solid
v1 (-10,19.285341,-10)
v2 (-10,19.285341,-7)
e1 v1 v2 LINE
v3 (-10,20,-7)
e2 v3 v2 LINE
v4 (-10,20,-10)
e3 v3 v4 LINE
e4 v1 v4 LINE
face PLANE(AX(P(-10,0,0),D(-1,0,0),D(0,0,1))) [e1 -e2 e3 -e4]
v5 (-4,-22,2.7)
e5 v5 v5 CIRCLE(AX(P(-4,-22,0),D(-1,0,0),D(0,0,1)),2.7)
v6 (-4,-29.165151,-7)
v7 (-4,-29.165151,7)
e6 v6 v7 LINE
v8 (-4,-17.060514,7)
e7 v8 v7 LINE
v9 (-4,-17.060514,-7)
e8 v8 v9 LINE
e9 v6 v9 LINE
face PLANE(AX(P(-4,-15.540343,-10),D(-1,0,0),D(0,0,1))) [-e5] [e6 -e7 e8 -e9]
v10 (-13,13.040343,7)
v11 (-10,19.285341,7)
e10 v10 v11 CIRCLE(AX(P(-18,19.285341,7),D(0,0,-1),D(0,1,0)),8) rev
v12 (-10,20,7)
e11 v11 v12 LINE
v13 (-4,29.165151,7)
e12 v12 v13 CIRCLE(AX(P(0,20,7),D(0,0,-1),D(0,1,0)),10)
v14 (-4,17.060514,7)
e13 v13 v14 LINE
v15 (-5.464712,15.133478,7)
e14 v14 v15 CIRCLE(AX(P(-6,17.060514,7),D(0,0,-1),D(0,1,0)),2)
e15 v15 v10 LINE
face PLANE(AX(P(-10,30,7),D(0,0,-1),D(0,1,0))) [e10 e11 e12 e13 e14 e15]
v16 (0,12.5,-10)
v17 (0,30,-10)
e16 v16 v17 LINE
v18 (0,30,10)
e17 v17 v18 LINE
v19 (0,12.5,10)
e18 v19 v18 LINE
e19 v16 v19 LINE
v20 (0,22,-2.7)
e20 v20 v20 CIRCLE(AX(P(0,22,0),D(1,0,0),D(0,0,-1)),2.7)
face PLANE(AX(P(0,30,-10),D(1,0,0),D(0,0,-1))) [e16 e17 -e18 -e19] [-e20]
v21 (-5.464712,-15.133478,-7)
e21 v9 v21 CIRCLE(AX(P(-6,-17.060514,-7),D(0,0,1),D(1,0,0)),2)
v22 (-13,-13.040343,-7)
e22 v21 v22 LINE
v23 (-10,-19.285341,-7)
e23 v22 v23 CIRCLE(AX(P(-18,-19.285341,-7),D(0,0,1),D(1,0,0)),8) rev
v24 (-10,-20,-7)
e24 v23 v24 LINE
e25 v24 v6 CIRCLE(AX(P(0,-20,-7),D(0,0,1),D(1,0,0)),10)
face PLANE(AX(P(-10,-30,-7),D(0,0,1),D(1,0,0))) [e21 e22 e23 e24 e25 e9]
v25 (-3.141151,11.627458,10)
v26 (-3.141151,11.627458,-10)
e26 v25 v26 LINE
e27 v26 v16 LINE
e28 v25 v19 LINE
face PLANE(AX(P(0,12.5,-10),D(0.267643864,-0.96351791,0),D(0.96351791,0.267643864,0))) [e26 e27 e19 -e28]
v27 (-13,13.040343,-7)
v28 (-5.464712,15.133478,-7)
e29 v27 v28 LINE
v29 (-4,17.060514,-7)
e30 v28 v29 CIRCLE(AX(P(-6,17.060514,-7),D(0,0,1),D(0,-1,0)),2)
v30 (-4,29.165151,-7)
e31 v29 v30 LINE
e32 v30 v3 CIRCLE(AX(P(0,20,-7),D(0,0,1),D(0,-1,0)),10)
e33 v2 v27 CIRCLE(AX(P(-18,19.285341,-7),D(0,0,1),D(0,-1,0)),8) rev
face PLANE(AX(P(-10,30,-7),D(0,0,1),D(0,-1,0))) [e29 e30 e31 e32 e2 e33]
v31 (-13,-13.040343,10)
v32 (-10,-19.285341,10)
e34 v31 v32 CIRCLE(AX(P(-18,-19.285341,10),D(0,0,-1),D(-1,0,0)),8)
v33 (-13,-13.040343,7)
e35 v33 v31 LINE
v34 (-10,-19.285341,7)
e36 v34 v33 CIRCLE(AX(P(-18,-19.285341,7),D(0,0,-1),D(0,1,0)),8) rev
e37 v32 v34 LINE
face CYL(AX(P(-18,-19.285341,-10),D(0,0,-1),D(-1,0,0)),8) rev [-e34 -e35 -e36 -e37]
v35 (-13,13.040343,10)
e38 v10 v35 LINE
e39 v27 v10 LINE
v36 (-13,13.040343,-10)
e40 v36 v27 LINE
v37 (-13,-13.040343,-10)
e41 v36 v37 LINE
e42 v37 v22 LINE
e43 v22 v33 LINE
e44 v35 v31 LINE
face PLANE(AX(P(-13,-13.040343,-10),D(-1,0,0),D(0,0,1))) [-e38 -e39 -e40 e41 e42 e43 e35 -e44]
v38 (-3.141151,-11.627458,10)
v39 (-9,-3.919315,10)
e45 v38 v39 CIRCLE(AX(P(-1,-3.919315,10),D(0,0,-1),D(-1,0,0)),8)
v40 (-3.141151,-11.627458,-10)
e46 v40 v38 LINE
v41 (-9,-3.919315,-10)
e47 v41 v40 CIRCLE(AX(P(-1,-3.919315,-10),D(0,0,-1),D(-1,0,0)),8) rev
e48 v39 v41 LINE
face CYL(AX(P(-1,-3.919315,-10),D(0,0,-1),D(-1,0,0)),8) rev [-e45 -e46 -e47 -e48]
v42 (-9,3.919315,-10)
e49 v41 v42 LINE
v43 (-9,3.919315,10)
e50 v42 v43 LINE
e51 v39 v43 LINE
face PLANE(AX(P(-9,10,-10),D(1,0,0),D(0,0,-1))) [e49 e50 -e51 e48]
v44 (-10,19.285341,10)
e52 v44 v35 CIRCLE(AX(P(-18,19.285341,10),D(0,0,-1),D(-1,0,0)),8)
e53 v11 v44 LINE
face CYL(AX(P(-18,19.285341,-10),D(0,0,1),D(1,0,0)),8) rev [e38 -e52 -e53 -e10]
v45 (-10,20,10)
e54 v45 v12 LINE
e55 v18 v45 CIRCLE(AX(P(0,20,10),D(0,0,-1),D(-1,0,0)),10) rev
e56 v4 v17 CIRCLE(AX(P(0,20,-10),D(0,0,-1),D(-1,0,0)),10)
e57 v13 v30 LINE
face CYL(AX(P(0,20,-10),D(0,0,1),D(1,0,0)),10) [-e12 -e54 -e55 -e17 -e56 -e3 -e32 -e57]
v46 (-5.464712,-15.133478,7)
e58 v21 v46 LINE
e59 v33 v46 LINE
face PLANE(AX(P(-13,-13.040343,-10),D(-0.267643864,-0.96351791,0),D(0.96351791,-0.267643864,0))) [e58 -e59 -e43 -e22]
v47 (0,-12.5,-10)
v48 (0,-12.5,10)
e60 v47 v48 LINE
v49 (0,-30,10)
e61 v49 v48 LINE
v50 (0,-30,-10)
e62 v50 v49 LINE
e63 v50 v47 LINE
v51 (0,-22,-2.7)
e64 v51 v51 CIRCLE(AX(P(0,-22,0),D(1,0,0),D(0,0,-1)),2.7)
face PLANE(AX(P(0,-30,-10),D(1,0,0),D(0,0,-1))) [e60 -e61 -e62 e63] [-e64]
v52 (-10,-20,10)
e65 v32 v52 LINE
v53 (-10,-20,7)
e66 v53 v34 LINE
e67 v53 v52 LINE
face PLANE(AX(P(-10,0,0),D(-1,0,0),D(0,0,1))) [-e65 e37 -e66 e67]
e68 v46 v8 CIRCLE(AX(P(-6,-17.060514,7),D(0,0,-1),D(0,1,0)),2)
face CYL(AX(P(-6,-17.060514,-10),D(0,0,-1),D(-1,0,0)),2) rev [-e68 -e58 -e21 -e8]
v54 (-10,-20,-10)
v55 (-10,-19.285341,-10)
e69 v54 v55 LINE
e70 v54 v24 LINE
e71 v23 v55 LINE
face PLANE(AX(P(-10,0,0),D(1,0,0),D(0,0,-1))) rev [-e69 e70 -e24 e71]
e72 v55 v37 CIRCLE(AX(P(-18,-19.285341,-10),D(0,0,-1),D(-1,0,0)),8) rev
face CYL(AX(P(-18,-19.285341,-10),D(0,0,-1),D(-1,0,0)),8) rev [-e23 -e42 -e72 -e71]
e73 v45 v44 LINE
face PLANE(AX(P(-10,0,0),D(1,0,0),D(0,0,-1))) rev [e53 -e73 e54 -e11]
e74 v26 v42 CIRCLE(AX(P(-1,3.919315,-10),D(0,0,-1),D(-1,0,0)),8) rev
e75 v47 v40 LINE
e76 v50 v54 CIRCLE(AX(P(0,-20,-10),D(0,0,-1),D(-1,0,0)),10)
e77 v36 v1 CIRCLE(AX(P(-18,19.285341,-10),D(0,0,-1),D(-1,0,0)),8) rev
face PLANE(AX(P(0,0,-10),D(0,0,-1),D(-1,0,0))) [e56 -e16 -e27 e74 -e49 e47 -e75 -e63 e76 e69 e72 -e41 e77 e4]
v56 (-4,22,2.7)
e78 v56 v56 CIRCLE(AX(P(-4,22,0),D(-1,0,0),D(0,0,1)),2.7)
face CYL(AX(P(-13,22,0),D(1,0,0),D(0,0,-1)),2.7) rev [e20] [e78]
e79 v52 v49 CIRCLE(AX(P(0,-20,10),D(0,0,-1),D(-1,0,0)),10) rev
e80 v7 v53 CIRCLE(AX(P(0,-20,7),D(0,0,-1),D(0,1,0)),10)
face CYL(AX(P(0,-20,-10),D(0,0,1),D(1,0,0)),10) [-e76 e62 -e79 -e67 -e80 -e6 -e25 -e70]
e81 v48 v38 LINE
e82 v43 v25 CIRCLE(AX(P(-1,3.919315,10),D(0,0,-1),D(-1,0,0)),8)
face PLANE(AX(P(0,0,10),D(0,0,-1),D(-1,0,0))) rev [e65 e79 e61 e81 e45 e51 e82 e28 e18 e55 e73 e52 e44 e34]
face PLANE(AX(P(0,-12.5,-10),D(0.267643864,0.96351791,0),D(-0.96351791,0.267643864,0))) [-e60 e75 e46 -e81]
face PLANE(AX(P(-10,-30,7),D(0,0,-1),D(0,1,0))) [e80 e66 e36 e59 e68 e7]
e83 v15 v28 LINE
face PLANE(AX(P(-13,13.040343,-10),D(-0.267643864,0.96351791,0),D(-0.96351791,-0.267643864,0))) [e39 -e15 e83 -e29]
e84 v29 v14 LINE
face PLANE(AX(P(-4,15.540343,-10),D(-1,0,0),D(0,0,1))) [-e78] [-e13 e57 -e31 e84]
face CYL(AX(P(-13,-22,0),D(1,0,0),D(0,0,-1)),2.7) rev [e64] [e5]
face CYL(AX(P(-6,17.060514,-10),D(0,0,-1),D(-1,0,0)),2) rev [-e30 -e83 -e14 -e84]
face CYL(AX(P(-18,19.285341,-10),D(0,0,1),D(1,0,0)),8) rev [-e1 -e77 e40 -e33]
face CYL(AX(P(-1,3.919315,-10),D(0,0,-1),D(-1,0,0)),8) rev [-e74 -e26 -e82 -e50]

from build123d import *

# Parameters (mm, degrees)
EXTRUDE_1_DEPTH      = 10
EXTRUDE_1_DEPTH_BACK = 10
SKETCH_2_R           = 2.7
CUT_EXTRUDE_1_DEPTH  = 35.190641995
SKETCH_3_W           = 3
SKETCH_3_H           = 17.5
EXTRUDE_2_DEPTH      = 10
FILLET_1_R           = 10
FILLET_2_R           = 8
FILLET_3_R           = 8
FILLET_4_R           = 2


with BuildPart() as part:
    # 草图1 → 凸台-拉伸1 (new, two sides: drawn at the far end of the back side and taken through both)
    with BuildSketch(Plane.XY.offset(-EXTRUDE_1_DEPTH_BACK)):
        Polygon((0, 30), (0, 12.5), (-9, 10), (-9, -10), (0, -12.5), (0, -30), (-4, -30), (-4, -15.540342598), (-13, -13.040342598), (-13, 13.040342598), (-4, 15.540342598), (-4, 30), align=None)
    extrude(amount=EXTRUDE_1_DEPTH + EXTRUDE_1_DEPTH_BACK)

    # 草图2 → 切除-拉伸1 (cut, through all)
    with BuildSketch(Plane(origin=(0, 0, 0), x_dir=(0, 0, -1), z_dir=(1, 0, 0))):
        with Locations((0, 22)):
            Circle(SKETCH_2_R)
        with Locations((0, -22)):
            Circle(SKETCH_2_R)
    extrude(amount=-CUT_EXTRUDE_1_DEPTH, mode=Mode.SUBTRACT)

    # 草图3 → 凸台-拉伸2 (add)
    with BuildSketch(Plane(origin=(0, 0, 0), x_dir=(0, 0, -1), z_dir=(1, 0, 0))):
        with Locations((-8.5, 21.25)):
            Rectangle(SKETCH_3_W, SKETCH_3_H)
        with Locations((8.5, 21.25)):
            Rectangle(SKETCH_3_W, SKETCH_3_H)
        with Locations((-8.5, -21.25)):
            Rectangle(SKETCH_3_W, SKETCH_3_H)
        with Locations((8.5, -21.25)):
            Rectangle(SKETCH_3_W, SKETCH_3_H)
    extrude(amount=-EXTRUDE_2_DEPTH)

    # 圆角1
    # the kernel refuses this fillet: 10 mm, written as the material it takes off along each edge
    with BuildSketch(Plane(origin=(-10, -30, -35), x_dir=(1, 0, 0), z_dir=(0, 0, 1)), Plane(origin=(-10, 30, -35), x_dir=(0, -1, 0), z_dir=(0, 0, 1))) as fillet_1_piece_1:
        with BuildLine():
            CenterArc((FILLET_1_R, FILLET_1_R), FILLET_1_R, 180, 90)
            Line((0, FILLET_1_R), (0, 0))
            Line((0, 0), (FILLET_1_R, 0))
        make_face()
    extrude(amount=53, mode=Mode.SUBTRACT)

    # 圆角2
    # the kernel refuses this fillet: 8 mm, written as the material it adds along each edge
    with BuildSketch(Plane(origin=(-10, 13.873675932, 7), x_dir=(0, 1, 0), z_dir=(0, 0, 1))) as fillet_2_piece_1:
        with BuildLine():
            CenterArc((5.411664665, 8), FILLET_2_R, 218.682187453, 51.317812547)
            Line((-0.833333333, 3), (-0.958233293, 2.9))
            ThreePointArc((-0.958233293, 2.9), (-0.570829532, 1.457176982), (-0.154162866, -0.042823018))
            Line((-0.154162866, -0.042823018), (0, -0.16))
            Line((0, -0.16), (5.411664665, -0.16))
            Line((5.411664665, -0.16), (5.411664665, 0))
        make_face()
    extrude(amount=3)
    with BuildSketch(Plane(origin=(-10, 13.873675932, -7), x_dir=(-0.963517909629979, -0.26764386378595645, 0), z_dir=(0, 0, -1)), Plane(origin=(-10, -13.873675932, 7), x_dir=(-0.963517909629979, 0.26764386378595645, 0), z_dir=(0, 0, 1))) as fillet_2_piece_2:
        with BuildLine():
            CenterArc((6.259744437, 7.355386736), FILLET_2_R, 195.524110997, 51.317812547)
            Line((-1.44839884, 5.214235826), (-1.602561706, 5.171412807))
            Line((-1.602561706, 5.171412807), (-0.154162866, -0.042823018))
            Line((-0.154162866, -0.042823018), (0, -0.16))
            ThreePointArc((0, -0.16), (1.556795141, -0.16), (3.050667199, -0.147107735))
            Line((3.050667199, -0.147107735), (3.113590282, 0))
        make_face()
    extrude(amount=3)
    with BuildSketch(Plane(origin=(-10, -13.873675932, -7), x_dir=(-0.963517909629979, 0.26764386378595645, 0), z_dir=(0, 0, -1))) as fillet_2_piece_3:
        with BuildLine():
            CenterArc((6.259744437, -7.355386736), FILLET_2_R, 113.158076457, 51.317812547)
            Line((-1.44839884, -5.214235826), (-1.602561706, -5.171412807))
            Line((-1.602561706, -5.171412807), (-0.154162866, 0.042823018))
            Line((-0.154162866, 0.042823018), (0, 0.16))
            ThreePointArc((0, 0.16), (1.556795141, 0.16), (3.050667199, 0.147107735))
            Line((3.050667199, 0.147107735), (3.113590282, 0))
        make_face()
    extrude(amount=3)

    # 圆角3
    fillet_3_edges = [part.edges().sort_by_distance(p)[0] for p in [
        (-9, 10, 0),
        (-9, -10, 0),
    ]]
    fillet(fillet_3_edges, radius=FILLET_3_R)

    # 圆角4
    fillet_4_edges = [part.edges().sort_by_distance(p)[0] for p in [
        (-4, 15.540342598, 0),
        (-4, -15.540342598, 0),
    ]]
    fillet(fillet_4_edges, radius=FILLET_4_R)


solid = part.part
